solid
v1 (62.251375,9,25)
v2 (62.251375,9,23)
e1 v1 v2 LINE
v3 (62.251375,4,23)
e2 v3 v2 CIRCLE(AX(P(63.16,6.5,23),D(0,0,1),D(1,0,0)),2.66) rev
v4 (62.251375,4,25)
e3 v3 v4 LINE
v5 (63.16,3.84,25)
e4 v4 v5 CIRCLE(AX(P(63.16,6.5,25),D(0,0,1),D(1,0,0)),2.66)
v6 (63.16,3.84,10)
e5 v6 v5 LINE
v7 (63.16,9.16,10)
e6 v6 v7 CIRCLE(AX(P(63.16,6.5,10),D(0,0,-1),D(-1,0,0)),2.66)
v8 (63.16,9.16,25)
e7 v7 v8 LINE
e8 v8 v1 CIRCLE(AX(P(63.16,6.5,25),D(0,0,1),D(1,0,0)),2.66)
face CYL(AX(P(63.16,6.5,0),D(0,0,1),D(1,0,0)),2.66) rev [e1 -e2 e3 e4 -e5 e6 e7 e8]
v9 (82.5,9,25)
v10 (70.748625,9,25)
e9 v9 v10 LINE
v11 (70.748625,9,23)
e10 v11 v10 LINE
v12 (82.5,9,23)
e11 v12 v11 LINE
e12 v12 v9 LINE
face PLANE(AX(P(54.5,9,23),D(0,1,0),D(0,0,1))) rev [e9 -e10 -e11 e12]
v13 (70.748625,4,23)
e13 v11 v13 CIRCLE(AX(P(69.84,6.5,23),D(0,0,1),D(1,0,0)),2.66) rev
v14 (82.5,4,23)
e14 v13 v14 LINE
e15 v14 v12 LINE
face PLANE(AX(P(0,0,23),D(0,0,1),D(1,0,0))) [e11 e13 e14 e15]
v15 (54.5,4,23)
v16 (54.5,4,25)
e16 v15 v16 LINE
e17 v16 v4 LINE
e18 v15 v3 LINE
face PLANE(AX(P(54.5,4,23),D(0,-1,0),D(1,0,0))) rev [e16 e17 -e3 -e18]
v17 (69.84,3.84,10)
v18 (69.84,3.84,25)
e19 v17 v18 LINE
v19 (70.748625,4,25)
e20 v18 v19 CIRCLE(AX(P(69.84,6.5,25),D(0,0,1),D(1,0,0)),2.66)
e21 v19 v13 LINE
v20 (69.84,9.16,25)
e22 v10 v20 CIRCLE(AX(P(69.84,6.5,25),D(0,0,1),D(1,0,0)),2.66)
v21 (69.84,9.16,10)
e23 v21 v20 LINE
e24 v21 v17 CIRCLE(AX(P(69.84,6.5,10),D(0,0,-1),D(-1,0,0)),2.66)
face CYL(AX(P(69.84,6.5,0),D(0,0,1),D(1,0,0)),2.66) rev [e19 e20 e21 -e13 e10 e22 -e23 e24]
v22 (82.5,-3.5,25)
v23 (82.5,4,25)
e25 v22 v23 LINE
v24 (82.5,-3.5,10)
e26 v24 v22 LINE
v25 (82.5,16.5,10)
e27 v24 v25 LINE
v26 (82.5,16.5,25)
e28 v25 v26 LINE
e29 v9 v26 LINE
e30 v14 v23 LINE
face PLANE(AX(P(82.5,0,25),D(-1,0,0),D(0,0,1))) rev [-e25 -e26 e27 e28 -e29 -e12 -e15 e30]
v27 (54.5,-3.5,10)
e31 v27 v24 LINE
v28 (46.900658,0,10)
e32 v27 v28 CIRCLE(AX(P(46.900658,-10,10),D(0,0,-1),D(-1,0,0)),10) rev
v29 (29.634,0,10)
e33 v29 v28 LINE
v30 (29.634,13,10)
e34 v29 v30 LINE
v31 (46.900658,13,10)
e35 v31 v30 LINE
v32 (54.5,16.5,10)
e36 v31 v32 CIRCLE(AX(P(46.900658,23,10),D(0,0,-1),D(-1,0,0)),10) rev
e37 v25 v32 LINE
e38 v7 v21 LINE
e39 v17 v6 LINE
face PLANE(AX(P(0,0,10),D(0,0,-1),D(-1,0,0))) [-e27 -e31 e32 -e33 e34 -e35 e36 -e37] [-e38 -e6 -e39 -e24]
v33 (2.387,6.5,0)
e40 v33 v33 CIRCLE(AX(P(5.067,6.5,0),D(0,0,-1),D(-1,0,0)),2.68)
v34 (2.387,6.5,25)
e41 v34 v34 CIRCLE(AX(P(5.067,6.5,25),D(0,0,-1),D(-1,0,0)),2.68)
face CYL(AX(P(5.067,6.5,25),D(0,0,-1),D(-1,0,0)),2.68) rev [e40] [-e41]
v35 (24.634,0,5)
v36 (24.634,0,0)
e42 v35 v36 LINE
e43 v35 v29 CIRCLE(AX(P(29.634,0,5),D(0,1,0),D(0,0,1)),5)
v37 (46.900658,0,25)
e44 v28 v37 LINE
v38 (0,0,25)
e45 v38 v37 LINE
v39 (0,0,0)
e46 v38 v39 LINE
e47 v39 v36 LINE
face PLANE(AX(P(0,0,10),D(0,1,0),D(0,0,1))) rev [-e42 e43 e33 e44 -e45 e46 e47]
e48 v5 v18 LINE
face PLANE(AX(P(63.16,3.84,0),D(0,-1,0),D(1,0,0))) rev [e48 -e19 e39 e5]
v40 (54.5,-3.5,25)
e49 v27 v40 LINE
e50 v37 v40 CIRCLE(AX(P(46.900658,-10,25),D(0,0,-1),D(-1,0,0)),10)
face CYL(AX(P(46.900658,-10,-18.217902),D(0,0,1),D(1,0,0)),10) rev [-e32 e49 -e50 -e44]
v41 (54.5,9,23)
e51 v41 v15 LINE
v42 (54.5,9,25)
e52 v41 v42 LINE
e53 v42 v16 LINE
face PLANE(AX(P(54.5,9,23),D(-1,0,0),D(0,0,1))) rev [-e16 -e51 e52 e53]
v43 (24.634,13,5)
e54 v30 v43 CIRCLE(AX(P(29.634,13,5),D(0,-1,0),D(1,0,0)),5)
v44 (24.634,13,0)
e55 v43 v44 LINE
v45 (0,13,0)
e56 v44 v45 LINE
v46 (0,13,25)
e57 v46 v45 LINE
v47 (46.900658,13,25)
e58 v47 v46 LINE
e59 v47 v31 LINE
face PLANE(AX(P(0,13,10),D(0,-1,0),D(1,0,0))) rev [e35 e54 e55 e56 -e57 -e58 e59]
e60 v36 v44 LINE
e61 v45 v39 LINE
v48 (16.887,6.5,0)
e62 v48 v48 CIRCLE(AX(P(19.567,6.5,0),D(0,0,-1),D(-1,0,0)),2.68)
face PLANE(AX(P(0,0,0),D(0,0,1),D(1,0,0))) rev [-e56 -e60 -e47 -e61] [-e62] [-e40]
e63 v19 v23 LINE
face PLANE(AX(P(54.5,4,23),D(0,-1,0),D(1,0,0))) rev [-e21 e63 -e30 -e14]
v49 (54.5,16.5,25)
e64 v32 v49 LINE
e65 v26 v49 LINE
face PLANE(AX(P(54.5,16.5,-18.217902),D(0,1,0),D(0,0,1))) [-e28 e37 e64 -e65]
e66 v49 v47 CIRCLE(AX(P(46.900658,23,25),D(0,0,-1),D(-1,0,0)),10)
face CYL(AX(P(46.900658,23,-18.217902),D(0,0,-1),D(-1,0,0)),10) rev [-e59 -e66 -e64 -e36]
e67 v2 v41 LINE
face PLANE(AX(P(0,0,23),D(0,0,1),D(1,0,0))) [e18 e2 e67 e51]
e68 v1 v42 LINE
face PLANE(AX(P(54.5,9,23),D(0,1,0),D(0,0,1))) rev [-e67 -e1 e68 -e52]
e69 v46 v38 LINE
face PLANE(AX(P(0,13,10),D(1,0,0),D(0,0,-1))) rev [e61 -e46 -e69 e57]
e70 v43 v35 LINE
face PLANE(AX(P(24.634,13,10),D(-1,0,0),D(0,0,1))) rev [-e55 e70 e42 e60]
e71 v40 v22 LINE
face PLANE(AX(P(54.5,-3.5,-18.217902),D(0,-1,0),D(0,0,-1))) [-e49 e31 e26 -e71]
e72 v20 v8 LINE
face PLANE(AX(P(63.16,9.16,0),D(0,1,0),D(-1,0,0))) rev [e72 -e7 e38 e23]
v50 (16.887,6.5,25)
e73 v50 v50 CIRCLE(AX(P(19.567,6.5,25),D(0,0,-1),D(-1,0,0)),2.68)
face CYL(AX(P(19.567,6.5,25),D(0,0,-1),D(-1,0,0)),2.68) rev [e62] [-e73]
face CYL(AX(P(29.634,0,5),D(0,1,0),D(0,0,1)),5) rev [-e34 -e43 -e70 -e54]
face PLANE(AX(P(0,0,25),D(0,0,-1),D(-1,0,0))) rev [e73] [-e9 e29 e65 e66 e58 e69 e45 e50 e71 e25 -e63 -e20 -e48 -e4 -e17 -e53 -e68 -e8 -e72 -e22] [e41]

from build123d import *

# Parameters (mm, degrees)
SKETCH1_W           = 24.634
SKETCH1_H           = 13
BOSS_EXTRUDE1_DEPTH = 10
SKETCH4_W           = 82.5
SKETCH4_H           = 13
BOSS_EXTRUDE4_DEPTH = 15
SKETCH5_W           = 28
SKETCH5_H           = 3.5
BOSS_EXTRUDE5_DEPTH = 15
CUT_EXTRUDE1_DEPTH  = 88.769584709
SKETCH7_W           = 28
SKETCH7_H           = 5
CUT_EXTRUDE2_DEPTH  = 2
SKETCH11_R          = 2.68
CUT_EXTRUDE3_DEPTH  = 88.769584709
FILLET1_R           = 10
FILLET2_R           = 5


with BuildPart() as part:
    # Sketch1 → Boss-Extrude1 (new body)
    with BuildSketch(Plane.XY):
        with Locations((12.317, 6.5)):
            Rectangle(SKETCH1_W, SKETCH1_H)
    extrude(amount=BOSS_EXTRUDE1_DEPTH)

    # Sketch4 → Boss-Extrude4 (add)
    with BuildSketch(Plane.XY.offset(10)):
        with Locations((41.25, 6.5)):
            Rectangle(SKETCH4_W, SKETCH4_H)
    extrude(amount=BOSS_EXTRUDE4_DEPTH)

    # Sketch5 → Boss-Extrude5 (add)
    with BuildSketch(Plane.XY.offset(25)):
        with Locations((68.5, -1.75)):
            Rectangle(SKETCH5_W, SKETCH5_H)
        with Locations((68.5, 14.75)):
            Rectangle(SKETCH5_W, SKETCH5_H)
    extrude(amount=-BOSS_EXTRUDE5_DEPTH)

    # Sketch6 → Cut-Extrude1 (cut, through all)
    with BuildSketch(Plane.XY.offset(25)):
        with BuildLine():
            Line((63.16, 9.16), (69.84, 9.16))
            ThreePointArc((69.84, 9.16), (72.5, 6.5), (69.84, 3.84))
            Line((69.84, 3.84), (63.16, 3.84))
            ThreePointArc((63.16, 3.84), (60.5, 6.5), (63.16, 9.16))
        make_face()
    extrude(amount=-CUT_EXTRUDE1_DEPTH, mode=Mode.SUBTRACT)

    # Sketch7 → Cut-Extrude2 (cut)
    with BuildSketch(Plane.XY.offset(25)):
        with Locations((68.5, 6.5)):
            Rectangle(SKETCH7_W, SKETCH7_H)
    extrude(amount=-CUT_EXTRUDE2_DEPTH, mode=Mode.SUBTRACT)

    # Sketch11 → Cut-Extrude3 (cut, through all)
    with BuildSketch(Plane(origin=(0, 0, 0), x_dir=(-1, 0, 0), z_dir=(0, 0, -1))):
        with Locations((-5.067, 6.5)):
            Circle(SKETCH11_R)
        with Locations((-19.567, 6.5)):
            Circle(SKETCH11_R)
    extrude(amount=-CUT_EXTRUDE3_DEPTH, mode=Mode.SUBTRACT)

    # Fillet1
    # the kernel refuses this fillet: 10 mm, written as the material it adds along each edge
    with BuildSketch(Plane(origin=(54.5, 13, 25), x_dir=(-1, 0, 0), z_dir=(0, 0, -1))) as fillet1_piece_1:
        with BuildLine():
            CenterArc((7.599342077, 10), FILLET1_R, 220.541601874, 49.458398126)
            Line((0, 3.5), (-0.151986842, 3.37))
            ThreePointArc((-0.151986842, 3.37), (-0.2, 1.75), (-0.2, 0))
            Line((-0.2, 0), (0, -0.2))
            Line((0, -0.2), (7.599342077, -0.2))
            Line((7.599342077, -0.2), (7.599342077, 0))
        make_face()
    extrude(amount=15)
    with BuildSketch(Plane(origin=(54.5, 0, 25), x_dir=(-1, 0, 0), z_dir=(0, 0, -1))) as fillet1_piece_2:
        with BuildLine():
            CenterArc((7.599342077, -10), FILLET1_R, 90, 49.458398126)
            Line((0, -3.5), (-0.151986842, -3.37))
            ThreePointArc((-0.151986842, -3.37), (-0.2, -1.75), (-0.2, 0))
            Line((-0.2, 0), (0, 0.2))
            Line((0, 0.2), (7.599342077, 0.2))
            Line((7.599342077, 0.2), (7.599342077, 0))
        make_face()
    extrude(amount=15)

    # Fillet2
    fillet2_edges = [part.edges().sort_by_distance(p)[0] for p in [
        (24.634, 6.5, 10),
    ]]
    fillet(fillet2_edges, radius=FILLET2_R)


solid = part.part
